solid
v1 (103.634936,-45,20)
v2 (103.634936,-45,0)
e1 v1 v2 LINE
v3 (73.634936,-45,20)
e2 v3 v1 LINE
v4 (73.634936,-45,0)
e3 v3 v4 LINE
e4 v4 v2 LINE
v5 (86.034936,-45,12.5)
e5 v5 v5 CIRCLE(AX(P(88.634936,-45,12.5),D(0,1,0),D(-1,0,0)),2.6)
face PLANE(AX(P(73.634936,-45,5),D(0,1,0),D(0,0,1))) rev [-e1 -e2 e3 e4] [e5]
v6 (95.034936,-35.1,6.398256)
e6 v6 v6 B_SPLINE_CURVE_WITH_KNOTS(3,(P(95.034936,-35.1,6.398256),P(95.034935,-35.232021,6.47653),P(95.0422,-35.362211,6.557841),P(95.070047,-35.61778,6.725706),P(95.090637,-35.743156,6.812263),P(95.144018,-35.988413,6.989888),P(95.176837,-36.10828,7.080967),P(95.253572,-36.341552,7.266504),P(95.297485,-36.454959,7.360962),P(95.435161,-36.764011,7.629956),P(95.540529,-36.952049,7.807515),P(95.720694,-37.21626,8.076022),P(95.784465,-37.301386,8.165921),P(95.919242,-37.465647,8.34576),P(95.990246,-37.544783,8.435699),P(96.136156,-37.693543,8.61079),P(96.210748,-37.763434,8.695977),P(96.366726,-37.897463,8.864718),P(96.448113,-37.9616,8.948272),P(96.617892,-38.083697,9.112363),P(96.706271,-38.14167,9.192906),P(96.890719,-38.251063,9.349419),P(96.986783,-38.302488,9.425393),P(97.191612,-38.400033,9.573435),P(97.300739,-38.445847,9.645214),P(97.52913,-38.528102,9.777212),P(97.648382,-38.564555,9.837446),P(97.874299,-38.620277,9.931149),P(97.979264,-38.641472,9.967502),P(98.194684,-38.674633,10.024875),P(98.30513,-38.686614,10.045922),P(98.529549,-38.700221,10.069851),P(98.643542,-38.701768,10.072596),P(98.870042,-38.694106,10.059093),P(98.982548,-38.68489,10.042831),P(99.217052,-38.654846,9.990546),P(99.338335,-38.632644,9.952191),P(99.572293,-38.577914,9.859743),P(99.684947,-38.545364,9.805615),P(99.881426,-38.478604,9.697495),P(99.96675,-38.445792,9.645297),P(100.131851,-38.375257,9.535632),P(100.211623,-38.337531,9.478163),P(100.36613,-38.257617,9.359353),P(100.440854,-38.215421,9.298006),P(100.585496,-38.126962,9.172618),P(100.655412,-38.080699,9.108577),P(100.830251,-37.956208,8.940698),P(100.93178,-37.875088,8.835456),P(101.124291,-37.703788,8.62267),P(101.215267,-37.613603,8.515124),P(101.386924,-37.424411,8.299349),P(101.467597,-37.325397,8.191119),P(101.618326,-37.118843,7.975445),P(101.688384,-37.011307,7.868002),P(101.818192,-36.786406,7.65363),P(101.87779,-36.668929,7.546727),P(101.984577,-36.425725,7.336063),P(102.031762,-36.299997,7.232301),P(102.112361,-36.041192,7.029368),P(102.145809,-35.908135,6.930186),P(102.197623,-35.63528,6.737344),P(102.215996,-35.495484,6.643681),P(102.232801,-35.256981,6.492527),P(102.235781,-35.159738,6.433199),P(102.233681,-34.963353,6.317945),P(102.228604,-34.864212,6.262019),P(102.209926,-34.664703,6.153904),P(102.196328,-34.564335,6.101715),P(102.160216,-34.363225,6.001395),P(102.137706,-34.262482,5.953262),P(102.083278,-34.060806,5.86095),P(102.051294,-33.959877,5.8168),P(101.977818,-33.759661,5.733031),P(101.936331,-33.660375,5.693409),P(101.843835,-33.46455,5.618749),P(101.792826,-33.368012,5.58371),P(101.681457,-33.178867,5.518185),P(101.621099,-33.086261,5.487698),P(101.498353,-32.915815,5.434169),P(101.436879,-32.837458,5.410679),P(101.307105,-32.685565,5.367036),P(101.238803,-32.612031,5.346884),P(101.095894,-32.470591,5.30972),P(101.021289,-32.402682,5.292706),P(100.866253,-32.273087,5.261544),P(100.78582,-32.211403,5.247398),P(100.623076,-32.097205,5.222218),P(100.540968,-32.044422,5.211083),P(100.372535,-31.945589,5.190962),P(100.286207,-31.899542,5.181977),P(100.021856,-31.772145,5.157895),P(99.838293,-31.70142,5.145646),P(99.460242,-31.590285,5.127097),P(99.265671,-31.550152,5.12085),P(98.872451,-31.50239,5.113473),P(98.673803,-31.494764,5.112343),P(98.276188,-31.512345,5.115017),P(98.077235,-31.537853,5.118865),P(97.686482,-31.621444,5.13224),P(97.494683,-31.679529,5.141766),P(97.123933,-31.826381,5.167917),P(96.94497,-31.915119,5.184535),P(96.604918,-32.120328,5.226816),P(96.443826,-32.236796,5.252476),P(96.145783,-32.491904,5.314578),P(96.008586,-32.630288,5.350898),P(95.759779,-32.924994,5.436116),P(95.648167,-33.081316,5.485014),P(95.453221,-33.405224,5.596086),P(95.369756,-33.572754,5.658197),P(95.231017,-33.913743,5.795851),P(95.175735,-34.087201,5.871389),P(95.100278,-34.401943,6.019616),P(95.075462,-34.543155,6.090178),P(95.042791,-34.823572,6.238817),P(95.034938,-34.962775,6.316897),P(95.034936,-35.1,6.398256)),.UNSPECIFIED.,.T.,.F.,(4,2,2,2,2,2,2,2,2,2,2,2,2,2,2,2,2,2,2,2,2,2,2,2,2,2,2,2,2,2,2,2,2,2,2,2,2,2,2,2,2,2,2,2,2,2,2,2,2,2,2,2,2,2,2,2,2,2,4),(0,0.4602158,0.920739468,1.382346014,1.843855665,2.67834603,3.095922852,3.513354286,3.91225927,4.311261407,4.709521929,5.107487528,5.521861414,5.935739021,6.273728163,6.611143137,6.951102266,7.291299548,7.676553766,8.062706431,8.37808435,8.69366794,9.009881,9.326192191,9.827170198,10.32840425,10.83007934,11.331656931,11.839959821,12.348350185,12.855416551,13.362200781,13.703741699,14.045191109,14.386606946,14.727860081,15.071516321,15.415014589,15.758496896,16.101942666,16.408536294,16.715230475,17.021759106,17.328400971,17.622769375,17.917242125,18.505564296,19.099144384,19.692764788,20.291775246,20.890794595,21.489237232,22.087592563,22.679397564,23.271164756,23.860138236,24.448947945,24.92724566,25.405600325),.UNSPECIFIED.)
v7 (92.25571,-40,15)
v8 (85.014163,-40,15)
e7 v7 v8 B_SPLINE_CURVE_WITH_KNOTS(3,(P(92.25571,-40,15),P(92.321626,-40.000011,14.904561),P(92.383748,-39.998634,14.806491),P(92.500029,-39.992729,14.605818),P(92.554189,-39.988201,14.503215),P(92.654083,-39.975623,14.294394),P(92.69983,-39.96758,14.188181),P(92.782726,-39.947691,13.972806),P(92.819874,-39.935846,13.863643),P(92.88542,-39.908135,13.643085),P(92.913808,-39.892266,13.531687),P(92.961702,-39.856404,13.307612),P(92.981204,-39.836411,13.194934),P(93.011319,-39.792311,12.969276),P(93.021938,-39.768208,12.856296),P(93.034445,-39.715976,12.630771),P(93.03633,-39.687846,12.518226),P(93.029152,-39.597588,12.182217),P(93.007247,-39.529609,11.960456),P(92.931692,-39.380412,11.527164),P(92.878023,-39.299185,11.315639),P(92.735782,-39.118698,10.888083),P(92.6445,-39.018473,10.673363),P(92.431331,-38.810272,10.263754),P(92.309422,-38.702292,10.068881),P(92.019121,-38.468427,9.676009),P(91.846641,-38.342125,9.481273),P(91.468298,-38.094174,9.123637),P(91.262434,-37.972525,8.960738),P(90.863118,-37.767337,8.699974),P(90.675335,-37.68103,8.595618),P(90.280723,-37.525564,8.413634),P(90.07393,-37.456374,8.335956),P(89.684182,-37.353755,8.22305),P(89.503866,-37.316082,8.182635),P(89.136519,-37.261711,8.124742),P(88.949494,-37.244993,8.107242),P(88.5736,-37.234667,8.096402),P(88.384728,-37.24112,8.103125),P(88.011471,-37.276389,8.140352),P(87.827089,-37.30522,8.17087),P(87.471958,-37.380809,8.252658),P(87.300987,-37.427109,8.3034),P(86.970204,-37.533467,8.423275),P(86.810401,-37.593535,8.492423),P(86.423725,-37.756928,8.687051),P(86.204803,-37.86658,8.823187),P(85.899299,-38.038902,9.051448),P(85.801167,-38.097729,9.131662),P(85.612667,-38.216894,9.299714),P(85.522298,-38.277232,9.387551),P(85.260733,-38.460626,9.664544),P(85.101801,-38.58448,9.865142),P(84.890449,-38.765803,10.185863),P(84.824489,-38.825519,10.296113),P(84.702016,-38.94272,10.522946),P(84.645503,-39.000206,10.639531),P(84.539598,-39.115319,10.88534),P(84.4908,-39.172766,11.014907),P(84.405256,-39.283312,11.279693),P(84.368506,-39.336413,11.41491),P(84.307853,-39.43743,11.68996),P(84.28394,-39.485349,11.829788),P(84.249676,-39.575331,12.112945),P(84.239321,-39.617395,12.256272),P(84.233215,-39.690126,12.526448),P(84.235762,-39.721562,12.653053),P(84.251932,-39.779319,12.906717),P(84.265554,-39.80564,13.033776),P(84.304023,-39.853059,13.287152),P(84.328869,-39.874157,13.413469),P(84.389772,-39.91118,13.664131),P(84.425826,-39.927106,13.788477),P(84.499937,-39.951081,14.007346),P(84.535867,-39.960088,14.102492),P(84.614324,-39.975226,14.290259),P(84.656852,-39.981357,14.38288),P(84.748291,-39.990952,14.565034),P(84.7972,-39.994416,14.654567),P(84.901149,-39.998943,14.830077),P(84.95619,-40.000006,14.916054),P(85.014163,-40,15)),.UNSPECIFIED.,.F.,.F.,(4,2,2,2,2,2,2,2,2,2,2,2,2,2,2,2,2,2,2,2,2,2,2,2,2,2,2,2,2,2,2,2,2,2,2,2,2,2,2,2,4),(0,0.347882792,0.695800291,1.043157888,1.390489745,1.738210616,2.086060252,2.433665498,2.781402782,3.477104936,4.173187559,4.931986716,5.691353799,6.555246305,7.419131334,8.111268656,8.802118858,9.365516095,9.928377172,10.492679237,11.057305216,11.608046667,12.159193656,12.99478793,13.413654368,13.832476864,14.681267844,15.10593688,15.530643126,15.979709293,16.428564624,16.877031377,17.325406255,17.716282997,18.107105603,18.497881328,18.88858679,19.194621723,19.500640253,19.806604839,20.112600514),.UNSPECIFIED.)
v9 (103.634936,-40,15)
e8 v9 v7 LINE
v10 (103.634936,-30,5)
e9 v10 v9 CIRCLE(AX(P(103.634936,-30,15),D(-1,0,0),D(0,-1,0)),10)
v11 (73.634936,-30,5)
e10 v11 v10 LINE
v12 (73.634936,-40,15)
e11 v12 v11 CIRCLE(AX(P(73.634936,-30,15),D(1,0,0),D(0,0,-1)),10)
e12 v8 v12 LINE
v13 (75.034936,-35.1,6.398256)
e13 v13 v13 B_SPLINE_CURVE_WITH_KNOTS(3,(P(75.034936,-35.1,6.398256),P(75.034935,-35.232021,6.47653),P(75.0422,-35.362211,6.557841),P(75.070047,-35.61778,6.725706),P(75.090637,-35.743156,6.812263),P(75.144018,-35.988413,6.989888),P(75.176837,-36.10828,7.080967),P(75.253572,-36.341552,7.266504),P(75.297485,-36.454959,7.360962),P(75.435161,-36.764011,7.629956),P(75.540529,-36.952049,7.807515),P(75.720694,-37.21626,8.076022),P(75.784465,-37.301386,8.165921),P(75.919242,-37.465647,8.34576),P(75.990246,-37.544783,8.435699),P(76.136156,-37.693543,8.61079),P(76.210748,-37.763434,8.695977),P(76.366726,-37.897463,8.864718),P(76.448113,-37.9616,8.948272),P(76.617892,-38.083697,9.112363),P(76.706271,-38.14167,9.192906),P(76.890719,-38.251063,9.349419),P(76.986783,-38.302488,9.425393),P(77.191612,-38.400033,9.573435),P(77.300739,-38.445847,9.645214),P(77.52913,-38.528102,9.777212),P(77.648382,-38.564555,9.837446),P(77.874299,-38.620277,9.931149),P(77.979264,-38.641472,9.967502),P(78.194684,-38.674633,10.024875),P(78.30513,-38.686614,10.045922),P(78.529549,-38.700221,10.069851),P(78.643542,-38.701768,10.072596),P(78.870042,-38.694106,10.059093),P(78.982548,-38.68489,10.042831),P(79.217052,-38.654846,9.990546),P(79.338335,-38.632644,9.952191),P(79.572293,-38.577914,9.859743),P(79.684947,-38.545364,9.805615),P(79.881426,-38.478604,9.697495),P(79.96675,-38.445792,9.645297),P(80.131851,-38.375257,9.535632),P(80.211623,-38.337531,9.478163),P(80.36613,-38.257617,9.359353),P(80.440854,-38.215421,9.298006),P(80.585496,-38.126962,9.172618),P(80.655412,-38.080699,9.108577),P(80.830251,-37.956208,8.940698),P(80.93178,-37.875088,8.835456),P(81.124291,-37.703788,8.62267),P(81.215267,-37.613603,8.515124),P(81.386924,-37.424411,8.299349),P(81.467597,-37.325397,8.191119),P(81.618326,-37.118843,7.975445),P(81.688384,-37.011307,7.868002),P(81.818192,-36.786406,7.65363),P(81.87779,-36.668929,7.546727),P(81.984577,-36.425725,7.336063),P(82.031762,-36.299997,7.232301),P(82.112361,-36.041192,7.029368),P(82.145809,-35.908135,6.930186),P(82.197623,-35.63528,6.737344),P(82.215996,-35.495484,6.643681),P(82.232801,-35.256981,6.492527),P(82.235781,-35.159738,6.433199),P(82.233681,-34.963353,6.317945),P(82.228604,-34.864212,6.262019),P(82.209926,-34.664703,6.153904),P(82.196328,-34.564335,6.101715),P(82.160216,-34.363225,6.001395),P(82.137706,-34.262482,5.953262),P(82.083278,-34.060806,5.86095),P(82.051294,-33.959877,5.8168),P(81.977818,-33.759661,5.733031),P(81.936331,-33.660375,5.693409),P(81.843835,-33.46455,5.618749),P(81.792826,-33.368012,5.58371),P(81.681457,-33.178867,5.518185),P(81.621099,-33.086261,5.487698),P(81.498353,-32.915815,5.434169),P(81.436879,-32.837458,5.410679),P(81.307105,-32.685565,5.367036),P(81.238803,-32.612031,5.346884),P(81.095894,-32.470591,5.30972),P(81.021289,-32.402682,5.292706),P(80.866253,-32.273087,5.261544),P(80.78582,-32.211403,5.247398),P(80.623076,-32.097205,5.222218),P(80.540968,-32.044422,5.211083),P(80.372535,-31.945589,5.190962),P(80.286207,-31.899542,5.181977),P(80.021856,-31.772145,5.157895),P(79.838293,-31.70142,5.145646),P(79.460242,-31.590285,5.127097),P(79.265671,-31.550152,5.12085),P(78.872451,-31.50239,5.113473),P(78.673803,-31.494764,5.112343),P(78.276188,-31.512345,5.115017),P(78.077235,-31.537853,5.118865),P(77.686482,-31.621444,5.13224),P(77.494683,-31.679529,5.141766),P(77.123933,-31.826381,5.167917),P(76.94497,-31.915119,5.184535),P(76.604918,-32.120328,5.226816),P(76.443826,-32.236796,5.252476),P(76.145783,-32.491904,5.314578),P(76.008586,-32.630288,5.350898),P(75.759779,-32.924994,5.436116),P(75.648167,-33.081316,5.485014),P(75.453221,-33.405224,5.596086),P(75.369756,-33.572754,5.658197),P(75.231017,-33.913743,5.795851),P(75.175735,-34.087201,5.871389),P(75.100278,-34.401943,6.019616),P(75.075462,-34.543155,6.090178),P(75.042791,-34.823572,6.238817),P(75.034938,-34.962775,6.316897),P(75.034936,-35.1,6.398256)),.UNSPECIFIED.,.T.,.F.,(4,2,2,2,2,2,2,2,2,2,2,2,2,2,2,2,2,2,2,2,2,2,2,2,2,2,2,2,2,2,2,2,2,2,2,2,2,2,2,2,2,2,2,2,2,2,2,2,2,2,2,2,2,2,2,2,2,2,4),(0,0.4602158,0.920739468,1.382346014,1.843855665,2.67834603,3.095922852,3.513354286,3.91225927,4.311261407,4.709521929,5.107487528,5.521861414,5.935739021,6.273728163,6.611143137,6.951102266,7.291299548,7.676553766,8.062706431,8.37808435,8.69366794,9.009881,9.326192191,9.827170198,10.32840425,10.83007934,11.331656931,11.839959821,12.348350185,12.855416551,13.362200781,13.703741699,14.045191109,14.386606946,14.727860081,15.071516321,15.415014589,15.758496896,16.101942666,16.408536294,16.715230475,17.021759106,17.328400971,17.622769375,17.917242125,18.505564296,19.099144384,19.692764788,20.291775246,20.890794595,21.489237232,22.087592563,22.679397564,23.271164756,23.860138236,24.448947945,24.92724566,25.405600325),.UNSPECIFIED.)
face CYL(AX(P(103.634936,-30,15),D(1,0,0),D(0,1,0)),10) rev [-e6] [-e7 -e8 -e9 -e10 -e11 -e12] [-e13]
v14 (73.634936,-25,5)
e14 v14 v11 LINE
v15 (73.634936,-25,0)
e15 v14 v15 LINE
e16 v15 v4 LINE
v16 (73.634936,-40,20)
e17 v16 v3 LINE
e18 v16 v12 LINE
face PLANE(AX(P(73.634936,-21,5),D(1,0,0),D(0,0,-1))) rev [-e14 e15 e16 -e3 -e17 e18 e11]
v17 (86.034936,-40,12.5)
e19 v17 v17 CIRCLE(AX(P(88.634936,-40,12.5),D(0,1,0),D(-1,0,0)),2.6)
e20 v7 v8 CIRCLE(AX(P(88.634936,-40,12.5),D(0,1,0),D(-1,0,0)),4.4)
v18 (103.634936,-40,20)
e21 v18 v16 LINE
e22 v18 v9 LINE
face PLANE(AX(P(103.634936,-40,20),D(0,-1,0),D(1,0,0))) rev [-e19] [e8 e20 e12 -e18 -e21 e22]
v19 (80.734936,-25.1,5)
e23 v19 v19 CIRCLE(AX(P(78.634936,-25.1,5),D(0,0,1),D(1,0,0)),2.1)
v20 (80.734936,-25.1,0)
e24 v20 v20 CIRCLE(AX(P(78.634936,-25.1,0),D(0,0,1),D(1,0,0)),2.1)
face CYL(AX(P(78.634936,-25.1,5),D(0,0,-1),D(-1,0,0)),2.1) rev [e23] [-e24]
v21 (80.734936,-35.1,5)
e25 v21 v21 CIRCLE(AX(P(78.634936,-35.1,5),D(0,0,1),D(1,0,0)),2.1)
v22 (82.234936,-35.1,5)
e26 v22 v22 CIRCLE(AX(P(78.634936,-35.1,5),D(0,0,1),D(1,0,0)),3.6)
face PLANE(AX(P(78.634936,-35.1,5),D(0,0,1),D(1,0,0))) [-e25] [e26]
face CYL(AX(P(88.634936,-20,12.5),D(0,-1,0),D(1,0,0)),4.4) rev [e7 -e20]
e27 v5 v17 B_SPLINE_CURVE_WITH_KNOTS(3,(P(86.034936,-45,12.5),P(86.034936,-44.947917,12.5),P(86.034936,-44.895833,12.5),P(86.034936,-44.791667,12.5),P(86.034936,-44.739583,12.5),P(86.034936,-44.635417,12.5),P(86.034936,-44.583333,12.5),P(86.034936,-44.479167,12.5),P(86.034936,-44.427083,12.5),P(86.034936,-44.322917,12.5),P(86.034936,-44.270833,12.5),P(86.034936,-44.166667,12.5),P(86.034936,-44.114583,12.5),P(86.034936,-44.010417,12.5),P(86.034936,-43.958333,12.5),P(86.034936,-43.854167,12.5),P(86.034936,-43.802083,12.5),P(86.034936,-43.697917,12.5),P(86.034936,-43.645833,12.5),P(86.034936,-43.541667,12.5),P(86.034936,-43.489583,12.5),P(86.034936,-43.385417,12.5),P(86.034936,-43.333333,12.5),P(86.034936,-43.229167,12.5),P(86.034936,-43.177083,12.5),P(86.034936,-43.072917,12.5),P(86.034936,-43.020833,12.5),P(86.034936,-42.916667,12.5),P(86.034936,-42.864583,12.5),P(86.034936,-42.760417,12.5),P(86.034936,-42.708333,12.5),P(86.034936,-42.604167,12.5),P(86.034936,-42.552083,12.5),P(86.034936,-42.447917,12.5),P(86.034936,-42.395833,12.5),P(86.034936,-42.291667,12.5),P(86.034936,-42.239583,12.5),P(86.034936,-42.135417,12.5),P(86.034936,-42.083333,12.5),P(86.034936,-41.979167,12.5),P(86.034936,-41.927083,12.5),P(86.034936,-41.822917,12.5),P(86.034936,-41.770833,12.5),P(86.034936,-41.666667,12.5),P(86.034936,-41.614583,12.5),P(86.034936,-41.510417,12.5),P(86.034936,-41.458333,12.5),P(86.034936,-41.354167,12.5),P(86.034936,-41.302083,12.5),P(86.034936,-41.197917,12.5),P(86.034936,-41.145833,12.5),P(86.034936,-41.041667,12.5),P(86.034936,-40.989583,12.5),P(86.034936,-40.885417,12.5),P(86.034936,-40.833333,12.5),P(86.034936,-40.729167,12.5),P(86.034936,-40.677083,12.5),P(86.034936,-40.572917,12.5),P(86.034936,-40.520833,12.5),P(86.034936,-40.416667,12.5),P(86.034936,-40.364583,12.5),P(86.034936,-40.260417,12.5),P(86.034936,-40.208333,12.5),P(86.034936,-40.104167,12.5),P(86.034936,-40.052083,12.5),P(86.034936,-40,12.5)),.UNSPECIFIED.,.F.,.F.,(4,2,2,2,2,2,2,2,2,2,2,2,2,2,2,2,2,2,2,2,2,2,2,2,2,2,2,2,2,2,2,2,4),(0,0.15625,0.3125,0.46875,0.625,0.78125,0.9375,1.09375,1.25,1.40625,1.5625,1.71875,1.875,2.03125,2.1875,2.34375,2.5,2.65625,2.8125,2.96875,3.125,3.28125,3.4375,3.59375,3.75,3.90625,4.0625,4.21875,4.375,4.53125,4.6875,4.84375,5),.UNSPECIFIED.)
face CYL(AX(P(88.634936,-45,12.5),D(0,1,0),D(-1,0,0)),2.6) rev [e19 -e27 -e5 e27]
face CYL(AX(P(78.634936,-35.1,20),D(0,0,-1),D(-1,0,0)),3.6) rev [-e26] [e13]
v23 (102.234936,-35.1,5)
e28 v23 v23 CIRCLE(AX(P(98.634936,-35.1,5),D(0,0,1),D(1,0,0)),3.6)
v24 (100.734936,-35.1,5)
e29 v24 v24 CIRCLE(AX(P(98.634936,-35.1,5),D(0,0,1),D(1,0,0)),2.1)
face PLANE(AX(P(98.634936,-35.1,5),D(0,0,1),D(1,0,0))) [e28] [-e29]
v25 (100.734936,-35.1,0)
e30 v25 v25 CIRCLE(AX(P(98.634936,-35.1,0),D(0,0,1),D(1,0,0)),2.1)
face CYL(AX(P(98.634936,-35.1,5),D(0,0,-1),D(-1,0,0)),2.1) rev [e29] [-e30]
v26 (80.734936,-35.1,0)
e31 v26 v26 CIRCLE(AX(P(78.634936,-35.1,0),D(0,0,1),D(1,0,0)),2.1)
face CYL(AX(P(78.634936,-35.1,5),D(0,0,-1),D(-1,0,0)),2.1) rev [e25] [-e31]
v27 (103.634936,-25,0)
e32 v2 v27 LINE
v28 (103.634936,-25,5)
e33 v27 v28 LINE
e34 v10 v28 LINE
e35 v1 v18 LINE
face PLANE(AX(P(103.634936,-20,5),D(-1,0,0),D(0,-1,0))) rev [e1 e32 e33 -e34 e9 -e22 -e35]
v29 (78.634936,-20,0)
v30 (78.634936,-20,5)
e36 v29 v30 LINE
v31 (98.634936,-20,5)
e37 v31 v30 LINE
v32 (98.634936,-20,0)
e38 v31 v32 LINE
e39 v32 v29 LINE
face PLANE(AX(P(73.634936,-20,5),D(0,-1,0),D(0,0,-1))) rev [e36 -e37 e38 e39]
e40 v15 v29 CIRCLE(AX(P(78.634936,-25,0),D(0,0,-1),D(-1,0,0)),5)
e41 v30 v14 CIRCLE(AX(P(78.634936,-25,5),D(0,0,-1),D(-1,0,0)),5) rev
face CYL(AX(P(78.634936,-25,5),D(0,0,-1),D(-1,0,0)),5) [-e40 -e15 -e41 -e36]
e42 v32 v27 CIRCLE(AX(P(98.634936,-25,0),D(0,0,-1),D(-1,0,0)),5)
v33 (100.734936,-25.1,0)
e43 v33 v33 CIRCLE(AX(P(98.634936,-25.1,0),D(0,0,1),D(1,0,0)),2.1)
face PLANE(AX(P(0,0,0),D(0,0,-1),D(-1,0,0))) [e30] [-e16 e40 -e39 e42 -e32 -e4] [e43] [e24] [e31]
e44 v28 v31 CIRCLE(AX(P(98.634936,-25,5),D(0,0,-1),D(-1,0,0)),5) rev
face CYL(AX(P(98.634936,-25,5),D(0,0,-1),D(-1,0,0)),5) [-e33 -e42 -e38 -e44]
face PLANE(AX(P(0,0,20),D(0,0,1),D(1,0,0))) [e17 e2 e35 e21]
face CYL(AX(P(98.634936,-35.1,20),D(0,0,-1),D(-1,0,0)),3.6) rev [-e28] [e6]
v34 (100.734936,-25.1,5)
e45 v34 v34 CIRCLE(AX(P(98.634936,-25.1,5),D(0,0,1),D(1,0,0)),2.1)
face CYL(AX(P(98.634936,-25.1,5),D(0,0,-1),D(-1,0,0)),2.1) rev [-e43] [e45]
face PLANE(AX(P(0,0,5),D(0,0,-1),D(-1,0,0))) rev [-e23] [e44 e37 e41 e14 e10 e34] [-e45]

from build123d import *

# Parameters (mm, degrees)
SKETCH1_R           = 2.1
BOSS_EXTRUDE1_DEPTH = 5
SKETCH3_W           = 30
SKETCH3_H           = 5
BOSS_EXTRUDE2_DEPTH = 15
FILLET1_R           = 5
SKETCH4_R           = 2.6
CUT_EXTRUDE2_DEPTH  = 108.425323176
FILLET2_R           = 10
SKETCH5_R           = 4.4
CUT_EXTRUDE3_DEPTH  = 108.425323272
SKETCH2_R           = 3.6
CUT_EXTRUDE4_DEPTH  = 114.974558916


with BuildPart() as part:
    # Sketch1 → Boss-Extrude1 (new body)
    with BuildSketch(Plane.XY):
        Polygon((73.634936481, -21), (73.634936481, -20), (103.634936481, -20), (103.634936481, -21), (103.634936481, -45), (73.634936481, -45), align=None)
        with Locations((98.634936481, -35.1)):
            Circle(SKETCH1_R, mode=Mode.SUBTRACT)
        with Locations((78.634936481, -35.1)):
            Circle(SKETCH1_R, mode=Mode.SUBTRACT)
        with Locations((98.634936481, -25.1)):
            Circle(SKETCH1_R, mode=Mode.SUBTRACT)
        with Locations((78.634936481, -25.1)):
            Circle(SKETCH1_R, mode=Mode.SUBTRACT)
    extrude(amount=BOSS_EXTRUDE1_DEPTH)

    # Sketch3 → Boss-Extrude2 (add)
    with BuildSketch(Plane.XY.offset(5)):
        with Locations((88.634936481, -42.5)):
            Rectangle(SKETCH3_W, SKETCH3_H)
    extrude(amount=BOSS_EXTRUDE2_DEPTH)

    # Fillet1
    fillet1_edges = [part.edges().sort_by_distance(p)[0] for p in [
        (103.634936481, -20, 2.5),
        (73.634936481, -20, 2.5),
    ]]
    fillet(fillet1_edges, radius=FILLET1_R)

    # Sketch4 → Cut-Extrude2 (cut, through all)
    with BuildSketch(Plane(origin=(0, -40, 0), x_dir=(1, 0, 0), z_dir=(0, 1, 0))):
        with Locations(Location((88.634936481, -12.5, 0), (0, 0, 180))):
            Circle(SKETCH4_R)
    extrude(amount=-CUT_EXTRUDE2_DEPTH, mode=Mode.SUBTRACT)

    # Fillet2
    # the kernel refuses this fillet: 10 mm, written as the material it adds along each edge
    with BuildSketch(Plane(origin=(73.634936481, -40, 5), x_dir=(0, 1, 0), z_dir=(1, 0, 0))) as fillet2_piece_1_section:
        with BuildLine():
            CenterArc((FILLET2_R, FILLET2_R), FILLET2_R, 180, 90)
            Line((0, FILLET2_R), (0, 0))
            Line((0, 0), (FILLET2_R, 0))
        make_face()
    fillet2_piece_1 = extrude(amount=30, mode=Mode.PRIVATE)
    fillet2_piece_1 = fillet2_piece_1 - Plane(origin=(98.634936481, -35.1, 7.280397509), x_dir=(1, 0, 0), z_dir=(0, 0, -1)) * Cylinder(2.1, 100, mode=Mode.PRIVATE)
    fillet2_piece_1 = fillet2_piece_1 - Plane(origin=(78.634936481, -35.1, 7.280397509), x_dir=(1, 0, 0), z_dir=(0, 0, -1)) * Cylinder(2.1, 100, mode=Mode.PRIVATE)
    fillet2_piece_1 = fillet2_piece_1 - Plane(origin=(88.634936481, -37.846705327, 12.5), x_dir=(-1, 0, 0), z_dir=(0, 1, 0)) * Cylinder(2.6, 100, mode=Mode.PRIVATE)
    add(fillet2_piece_1)

    # Sketch5 → Cut-Extrude3 (cut, through all)
    with BuildSketch(Plane(origin=(0, -40, 0), x_dir=(1, 0, 0), z_dir=(0, 1, 0))):
        with Locations((88.634936481, -12.5)):
            Circle(SKETCH5_R)
    extrude(amount=CUT_EXTRUDE3_DEPTH, mode=Mode.SUBTRACT)

    # Sketch2 → Cut-Extrude4 (cut, through all)
    with BuildSketch(Plane.XY.offset(5)):
        with Locations((98.634936481, -25.1)):
            Circle(SKETCH2_R)
        with Locations(Location((98.634936481, -35.1, 0), (0, 0, 180))):
            Circle(SKETCH2_R)
        with Locations((78.634936481, -25.1)):
            Circle(SKETCH2_R)
        with Locations(Location((78.634936481, -35.1, 0), (0, 0, 180))):
            Circle(SKETCH2_R)
    extrude(amount=CUT_EXTRUDE4_DEPTH, mode=Mode.SUBTRACT)


solid = part.part
